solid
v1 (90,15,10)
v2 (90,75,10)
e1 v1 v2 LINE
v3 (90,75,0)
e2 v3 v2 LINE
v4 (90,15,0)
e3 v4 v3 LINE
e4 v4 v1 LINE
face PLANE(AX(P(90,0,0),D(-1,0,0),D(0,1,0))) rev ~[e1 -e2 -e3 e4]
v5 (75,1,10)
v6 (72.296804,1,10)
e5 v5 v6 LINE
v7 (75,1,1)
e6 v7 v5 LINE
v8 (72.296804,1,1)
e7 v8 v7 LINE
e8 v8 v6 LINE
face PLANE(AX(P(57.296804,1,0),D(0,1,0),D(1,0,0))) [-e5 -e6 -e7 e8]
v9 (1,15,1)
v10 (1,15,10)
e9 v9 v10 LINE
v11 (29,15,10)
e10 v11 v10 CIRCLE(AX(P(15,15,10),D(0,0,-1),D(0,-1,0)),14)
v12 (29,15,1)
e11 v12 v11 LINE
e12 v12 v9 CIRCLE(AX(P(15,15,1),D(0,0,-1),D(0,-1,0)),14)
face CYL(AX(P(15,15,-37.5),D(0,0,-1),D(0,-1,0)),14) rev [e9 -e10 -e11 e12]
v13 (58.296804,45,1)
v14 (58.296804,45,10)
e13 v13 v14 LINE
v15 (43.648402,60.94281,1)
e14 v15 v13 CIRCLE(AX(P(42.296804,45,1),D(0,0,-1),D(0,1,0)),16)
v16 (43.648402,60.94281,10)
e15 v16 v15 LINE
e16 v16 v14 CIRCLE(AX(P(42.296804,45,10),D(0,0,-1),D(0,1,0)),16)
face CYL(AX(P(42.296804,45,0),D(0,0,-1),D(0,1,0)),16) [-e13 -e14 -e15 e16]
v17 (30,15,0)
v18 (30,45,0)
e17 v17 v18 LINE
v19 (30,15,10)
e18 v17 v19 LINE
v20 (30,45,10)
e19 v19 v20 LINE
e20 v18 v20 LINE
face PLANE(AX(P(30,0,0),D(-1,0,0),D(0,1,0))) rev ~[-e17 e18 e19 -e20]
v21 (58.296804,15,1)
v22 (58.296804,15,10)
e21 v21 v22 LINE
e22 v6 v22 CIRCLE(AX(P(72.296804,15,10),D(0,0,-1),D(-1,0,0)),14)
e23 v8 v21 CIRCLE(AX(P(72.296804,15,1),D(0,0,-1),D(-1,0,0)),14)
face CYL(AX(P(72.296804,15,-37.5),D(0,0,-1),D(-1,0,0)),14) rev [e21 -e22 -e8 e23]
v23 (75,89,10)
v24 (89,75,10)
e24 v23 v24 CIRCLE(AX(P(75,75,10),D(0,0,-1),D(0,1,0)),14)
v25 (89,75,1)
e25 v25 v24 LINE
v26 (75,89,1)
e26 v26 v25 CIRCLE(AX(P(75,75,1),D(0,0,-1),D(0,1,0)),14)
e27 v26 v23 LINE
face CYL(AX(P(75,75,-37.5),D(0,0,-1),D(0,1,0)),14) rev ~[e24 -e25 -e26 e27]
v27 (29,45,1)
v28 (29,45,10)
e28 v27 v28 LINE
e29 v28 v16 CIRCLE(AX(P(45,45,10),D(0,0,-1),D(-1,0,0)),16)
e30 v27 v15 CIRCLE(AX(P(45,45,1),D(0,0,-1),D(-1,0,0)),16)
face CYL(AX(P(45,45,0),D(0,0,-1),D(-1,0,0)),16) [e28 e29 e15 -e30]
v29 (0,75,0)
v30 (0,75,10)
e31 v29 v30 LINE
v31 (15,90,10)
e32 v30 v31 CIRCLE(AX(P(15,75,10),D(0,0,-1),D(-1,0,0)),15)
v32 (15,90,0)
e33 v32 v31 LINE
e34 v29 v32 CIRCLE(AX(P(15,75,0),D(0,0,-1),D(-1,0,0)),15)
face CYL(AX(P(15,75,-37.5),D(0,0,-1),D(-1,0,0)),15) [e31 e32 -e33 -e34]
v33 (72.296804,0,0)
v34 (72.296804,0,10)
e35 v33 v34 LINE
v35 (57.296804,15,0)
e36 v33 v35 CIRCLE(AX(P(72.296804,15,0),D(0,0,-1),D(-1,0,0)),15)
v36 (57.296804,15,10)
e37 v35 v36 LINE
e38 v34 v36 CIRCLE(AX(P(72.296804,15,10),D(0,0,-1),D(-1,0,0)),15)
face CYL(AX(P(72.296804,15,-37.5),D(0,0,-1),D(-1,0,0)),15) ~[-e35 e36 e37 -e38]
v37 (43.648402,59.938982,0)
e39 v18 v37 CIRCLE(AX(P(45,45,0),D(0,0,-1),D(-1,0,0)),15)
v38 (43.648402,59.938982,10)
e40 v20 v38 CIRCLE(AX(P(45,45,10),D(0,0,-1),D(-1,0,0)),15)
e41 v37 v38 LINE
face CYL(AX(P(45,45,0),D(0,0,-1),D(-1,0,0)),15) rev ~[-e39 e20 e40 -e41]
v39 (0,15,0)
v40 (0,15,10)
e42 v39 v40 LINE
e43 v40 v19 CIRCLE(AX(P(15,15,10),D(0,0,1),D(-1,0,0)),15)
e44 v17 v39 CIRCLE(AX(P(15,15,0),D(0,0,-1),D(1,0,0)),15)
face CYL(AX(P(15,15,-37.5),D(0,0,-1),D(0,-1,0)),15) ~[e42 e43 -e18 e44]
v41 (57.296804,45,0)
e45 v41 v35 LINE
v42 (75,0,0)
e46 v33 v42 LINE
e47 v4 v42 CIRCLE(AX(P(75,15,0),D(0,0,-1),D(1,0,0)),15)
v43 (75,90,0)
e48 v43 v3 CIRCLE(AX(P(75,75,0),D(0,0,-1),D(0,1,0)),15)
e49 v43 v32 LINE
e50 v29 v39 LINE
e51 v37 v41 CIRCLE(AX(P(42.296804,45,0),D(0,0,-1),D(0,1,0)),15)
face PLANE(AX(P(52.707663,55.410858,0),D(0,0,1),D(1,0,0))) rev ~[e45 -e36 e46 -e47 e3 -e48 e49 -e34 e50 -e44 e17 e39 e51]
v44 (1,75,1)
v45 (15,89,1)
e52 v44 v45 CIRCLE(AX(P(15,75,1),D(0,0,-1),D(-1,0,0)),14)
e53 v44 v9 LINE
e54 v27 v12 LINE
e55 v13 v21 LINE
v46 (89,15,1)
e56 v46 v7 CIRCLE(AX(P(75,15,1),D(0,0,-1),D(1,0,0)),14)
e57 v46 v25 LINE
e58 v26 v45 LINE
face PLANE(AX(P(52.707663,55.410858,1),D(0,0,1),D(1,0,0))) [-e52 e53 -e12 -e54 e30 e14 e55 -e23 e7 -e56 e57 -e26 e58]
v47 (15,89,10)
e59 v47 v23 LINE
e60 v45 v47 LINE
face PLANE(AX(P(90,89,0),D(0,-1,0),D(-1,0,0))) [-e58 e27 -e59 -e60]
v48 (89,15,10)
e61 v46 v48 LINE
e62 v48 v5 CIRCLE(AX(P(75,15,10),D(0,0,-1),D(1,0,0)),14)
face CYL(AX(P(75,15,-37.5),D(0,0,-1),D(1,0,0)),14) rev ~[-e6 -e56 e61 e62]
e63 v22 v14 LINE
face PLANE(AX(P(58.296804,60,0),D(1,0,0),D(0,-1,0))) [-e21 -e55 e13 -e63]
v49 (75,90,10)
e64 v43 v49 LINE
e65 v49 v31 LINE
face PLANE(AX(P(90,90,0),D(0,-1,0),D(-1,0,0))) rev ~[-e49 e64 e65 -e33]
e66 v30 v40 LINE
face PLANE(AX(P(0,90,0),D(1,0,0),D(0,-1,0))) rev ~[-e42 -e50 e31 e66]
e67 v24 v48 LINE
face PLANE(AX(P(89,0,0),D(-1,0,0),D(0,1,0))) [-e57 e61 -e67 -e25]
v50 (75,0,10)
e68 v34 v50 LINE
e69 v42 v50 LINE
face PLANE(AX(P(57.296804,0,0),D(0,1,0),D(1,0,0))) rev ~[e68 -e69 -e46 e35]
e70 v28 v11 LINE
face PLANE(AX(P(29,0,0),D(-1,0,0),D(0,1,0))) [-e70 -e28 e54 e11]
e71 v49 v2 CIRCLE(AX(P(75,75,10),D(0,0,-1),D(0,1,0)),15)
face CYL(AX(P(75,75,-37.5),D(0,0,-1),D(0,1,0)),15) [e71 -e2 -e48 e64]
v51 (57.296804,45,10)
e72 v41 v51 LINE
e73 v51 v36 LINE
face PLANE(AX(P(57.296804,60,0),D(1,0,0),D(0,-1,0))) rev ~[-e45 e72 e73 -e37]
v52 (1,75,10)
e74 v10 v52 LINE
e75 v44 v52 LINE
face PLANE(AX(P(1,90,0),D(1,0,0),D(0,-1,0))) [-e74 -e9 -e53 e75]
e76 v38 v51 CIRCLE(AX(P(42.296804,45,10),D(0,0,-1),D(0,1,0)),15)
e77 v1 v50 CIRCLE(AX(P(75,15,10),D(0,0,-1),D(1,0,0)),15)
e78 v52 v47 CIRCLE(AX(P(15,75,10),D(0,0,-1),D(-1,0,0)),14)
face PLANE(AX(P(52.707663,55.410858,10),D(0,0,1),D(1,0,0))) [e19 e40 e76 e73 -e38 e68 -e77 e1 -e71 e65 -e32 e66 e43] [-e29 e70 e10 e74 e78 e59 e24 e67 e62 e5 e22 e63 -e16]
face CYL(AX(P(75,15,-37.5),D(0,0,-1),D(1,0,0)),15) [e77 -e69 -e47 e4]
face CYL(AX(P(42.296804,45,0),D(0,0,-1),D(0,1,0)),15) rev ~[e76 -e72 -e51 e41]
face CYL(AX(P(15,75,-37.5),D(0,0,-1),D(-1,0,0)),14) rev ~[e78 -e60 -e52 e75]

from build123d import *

# Parameters (mm, degrees)
F1_DEPTH    = 10
F2_T1_DEPTH = 10
F2_T3_DEPTH = 85
F3_T        = -1


# Not quite as in the source:
# - a fillet or chamfer that OpenCascade refuses, or shapes differently, is made with other operations: its cross-section is extruded or revolved along the edge and cut away or added


with BuildPart() as f1:
    # F0 (on Top) → F1 (new body)
    with BuildSketch(Plane.XY):
        Polygon((0, 90), (0, 0), (30, 0), (30, 60), (57.2968044168, 60), (57.2968044168, 0), (90, 0), (90, 90), align=None)
    extrude(amount=F1_DEPTH)

    # F2: fillet of radius 15 on 8 edges, made by hand

    # F2_s2 → F2_t1 (join)
    with BuildSketch(Plane.XY):
        with BuildLine():
            ThreePointArc((42.2968044168, 60), (52.9034061346, 55.6066017178), (57.2968044168, 45))
            Line((57.2968044168, 45), (57.2968044168, 60))
            Line((57.2968044168, 60), (42.2968044168, 60))
        make_face()
        with BuildLine():
            ThreePointArc((30, 45), (34.3933982822, 55.6066017178), (45, 60))
            Line((45, 60), (30, 60))
            Line((30, 60), (30, 45))
        make_face()
    extrude(amount=F2_T1_DEPTH)

    # F2_s4 → F2_t3 (cut)
    with BuildSketch(Plane.XY.offset(-37.5)):
        with BuildLine():
            ThreePointArc((75, 90), (85.6066017178, 85.6066017178), (90, 75))
            Line((90, 75), (90, 90))
            Line((90, 90), (75, 90))
        make_face()
        with BuildLine():
            ThreePointArc((90, 15), (85.6066017178, 4.3933982822), (75, 0))
            Line((75, 0), (90, 0))
            Line((90, 0), (90, 15))
        make_face()
        with BuildLine():
            ThreePointArc((15, 0), (25.6066017178, 4.3933982822), (30, 15))
            Line((30, 15), (30, 0))
            Line((30, 0), (15, 0))
        make_face()
        with BuildLine():
            ThreePointArc((57.2968044168, 15), (61.690202699, 4.3933982822), (72.2968044168, 0))
            Line((72.2968044168, 0), (57.2968044168, 0))
            Line((57.2968044168, 0), (57.2968044168, 15))
        make_face()
        with BuildLine():
            ThreePointArc((0, 15), (4.3933982822, 4.3933982822), (15, 0))
            Line((15, 0), (0, 0))
            Line((0, 0), (0, 15))
        make_face()
        with BuildLine():
            ThreePointArc((0, 75), (4.3933982822, 85.6066017178), (15, 90))
            Line((15, 90), (0, 90))
            Line((0, 90), (0, 75))
        make_face()
    extrude(amount=F2_T3_DEPTH, mode=Mode.SUBTRACT)

    # F3
    f3_openings = [f1.faces().sort_by_distance(p)[0] for p in [
        (5.293398, 84.706602, 10),
    ]]
    offset(amount=F3_T, openings=f3_openings, kind=Kind.INTERSECTION)


solid = f1.part
